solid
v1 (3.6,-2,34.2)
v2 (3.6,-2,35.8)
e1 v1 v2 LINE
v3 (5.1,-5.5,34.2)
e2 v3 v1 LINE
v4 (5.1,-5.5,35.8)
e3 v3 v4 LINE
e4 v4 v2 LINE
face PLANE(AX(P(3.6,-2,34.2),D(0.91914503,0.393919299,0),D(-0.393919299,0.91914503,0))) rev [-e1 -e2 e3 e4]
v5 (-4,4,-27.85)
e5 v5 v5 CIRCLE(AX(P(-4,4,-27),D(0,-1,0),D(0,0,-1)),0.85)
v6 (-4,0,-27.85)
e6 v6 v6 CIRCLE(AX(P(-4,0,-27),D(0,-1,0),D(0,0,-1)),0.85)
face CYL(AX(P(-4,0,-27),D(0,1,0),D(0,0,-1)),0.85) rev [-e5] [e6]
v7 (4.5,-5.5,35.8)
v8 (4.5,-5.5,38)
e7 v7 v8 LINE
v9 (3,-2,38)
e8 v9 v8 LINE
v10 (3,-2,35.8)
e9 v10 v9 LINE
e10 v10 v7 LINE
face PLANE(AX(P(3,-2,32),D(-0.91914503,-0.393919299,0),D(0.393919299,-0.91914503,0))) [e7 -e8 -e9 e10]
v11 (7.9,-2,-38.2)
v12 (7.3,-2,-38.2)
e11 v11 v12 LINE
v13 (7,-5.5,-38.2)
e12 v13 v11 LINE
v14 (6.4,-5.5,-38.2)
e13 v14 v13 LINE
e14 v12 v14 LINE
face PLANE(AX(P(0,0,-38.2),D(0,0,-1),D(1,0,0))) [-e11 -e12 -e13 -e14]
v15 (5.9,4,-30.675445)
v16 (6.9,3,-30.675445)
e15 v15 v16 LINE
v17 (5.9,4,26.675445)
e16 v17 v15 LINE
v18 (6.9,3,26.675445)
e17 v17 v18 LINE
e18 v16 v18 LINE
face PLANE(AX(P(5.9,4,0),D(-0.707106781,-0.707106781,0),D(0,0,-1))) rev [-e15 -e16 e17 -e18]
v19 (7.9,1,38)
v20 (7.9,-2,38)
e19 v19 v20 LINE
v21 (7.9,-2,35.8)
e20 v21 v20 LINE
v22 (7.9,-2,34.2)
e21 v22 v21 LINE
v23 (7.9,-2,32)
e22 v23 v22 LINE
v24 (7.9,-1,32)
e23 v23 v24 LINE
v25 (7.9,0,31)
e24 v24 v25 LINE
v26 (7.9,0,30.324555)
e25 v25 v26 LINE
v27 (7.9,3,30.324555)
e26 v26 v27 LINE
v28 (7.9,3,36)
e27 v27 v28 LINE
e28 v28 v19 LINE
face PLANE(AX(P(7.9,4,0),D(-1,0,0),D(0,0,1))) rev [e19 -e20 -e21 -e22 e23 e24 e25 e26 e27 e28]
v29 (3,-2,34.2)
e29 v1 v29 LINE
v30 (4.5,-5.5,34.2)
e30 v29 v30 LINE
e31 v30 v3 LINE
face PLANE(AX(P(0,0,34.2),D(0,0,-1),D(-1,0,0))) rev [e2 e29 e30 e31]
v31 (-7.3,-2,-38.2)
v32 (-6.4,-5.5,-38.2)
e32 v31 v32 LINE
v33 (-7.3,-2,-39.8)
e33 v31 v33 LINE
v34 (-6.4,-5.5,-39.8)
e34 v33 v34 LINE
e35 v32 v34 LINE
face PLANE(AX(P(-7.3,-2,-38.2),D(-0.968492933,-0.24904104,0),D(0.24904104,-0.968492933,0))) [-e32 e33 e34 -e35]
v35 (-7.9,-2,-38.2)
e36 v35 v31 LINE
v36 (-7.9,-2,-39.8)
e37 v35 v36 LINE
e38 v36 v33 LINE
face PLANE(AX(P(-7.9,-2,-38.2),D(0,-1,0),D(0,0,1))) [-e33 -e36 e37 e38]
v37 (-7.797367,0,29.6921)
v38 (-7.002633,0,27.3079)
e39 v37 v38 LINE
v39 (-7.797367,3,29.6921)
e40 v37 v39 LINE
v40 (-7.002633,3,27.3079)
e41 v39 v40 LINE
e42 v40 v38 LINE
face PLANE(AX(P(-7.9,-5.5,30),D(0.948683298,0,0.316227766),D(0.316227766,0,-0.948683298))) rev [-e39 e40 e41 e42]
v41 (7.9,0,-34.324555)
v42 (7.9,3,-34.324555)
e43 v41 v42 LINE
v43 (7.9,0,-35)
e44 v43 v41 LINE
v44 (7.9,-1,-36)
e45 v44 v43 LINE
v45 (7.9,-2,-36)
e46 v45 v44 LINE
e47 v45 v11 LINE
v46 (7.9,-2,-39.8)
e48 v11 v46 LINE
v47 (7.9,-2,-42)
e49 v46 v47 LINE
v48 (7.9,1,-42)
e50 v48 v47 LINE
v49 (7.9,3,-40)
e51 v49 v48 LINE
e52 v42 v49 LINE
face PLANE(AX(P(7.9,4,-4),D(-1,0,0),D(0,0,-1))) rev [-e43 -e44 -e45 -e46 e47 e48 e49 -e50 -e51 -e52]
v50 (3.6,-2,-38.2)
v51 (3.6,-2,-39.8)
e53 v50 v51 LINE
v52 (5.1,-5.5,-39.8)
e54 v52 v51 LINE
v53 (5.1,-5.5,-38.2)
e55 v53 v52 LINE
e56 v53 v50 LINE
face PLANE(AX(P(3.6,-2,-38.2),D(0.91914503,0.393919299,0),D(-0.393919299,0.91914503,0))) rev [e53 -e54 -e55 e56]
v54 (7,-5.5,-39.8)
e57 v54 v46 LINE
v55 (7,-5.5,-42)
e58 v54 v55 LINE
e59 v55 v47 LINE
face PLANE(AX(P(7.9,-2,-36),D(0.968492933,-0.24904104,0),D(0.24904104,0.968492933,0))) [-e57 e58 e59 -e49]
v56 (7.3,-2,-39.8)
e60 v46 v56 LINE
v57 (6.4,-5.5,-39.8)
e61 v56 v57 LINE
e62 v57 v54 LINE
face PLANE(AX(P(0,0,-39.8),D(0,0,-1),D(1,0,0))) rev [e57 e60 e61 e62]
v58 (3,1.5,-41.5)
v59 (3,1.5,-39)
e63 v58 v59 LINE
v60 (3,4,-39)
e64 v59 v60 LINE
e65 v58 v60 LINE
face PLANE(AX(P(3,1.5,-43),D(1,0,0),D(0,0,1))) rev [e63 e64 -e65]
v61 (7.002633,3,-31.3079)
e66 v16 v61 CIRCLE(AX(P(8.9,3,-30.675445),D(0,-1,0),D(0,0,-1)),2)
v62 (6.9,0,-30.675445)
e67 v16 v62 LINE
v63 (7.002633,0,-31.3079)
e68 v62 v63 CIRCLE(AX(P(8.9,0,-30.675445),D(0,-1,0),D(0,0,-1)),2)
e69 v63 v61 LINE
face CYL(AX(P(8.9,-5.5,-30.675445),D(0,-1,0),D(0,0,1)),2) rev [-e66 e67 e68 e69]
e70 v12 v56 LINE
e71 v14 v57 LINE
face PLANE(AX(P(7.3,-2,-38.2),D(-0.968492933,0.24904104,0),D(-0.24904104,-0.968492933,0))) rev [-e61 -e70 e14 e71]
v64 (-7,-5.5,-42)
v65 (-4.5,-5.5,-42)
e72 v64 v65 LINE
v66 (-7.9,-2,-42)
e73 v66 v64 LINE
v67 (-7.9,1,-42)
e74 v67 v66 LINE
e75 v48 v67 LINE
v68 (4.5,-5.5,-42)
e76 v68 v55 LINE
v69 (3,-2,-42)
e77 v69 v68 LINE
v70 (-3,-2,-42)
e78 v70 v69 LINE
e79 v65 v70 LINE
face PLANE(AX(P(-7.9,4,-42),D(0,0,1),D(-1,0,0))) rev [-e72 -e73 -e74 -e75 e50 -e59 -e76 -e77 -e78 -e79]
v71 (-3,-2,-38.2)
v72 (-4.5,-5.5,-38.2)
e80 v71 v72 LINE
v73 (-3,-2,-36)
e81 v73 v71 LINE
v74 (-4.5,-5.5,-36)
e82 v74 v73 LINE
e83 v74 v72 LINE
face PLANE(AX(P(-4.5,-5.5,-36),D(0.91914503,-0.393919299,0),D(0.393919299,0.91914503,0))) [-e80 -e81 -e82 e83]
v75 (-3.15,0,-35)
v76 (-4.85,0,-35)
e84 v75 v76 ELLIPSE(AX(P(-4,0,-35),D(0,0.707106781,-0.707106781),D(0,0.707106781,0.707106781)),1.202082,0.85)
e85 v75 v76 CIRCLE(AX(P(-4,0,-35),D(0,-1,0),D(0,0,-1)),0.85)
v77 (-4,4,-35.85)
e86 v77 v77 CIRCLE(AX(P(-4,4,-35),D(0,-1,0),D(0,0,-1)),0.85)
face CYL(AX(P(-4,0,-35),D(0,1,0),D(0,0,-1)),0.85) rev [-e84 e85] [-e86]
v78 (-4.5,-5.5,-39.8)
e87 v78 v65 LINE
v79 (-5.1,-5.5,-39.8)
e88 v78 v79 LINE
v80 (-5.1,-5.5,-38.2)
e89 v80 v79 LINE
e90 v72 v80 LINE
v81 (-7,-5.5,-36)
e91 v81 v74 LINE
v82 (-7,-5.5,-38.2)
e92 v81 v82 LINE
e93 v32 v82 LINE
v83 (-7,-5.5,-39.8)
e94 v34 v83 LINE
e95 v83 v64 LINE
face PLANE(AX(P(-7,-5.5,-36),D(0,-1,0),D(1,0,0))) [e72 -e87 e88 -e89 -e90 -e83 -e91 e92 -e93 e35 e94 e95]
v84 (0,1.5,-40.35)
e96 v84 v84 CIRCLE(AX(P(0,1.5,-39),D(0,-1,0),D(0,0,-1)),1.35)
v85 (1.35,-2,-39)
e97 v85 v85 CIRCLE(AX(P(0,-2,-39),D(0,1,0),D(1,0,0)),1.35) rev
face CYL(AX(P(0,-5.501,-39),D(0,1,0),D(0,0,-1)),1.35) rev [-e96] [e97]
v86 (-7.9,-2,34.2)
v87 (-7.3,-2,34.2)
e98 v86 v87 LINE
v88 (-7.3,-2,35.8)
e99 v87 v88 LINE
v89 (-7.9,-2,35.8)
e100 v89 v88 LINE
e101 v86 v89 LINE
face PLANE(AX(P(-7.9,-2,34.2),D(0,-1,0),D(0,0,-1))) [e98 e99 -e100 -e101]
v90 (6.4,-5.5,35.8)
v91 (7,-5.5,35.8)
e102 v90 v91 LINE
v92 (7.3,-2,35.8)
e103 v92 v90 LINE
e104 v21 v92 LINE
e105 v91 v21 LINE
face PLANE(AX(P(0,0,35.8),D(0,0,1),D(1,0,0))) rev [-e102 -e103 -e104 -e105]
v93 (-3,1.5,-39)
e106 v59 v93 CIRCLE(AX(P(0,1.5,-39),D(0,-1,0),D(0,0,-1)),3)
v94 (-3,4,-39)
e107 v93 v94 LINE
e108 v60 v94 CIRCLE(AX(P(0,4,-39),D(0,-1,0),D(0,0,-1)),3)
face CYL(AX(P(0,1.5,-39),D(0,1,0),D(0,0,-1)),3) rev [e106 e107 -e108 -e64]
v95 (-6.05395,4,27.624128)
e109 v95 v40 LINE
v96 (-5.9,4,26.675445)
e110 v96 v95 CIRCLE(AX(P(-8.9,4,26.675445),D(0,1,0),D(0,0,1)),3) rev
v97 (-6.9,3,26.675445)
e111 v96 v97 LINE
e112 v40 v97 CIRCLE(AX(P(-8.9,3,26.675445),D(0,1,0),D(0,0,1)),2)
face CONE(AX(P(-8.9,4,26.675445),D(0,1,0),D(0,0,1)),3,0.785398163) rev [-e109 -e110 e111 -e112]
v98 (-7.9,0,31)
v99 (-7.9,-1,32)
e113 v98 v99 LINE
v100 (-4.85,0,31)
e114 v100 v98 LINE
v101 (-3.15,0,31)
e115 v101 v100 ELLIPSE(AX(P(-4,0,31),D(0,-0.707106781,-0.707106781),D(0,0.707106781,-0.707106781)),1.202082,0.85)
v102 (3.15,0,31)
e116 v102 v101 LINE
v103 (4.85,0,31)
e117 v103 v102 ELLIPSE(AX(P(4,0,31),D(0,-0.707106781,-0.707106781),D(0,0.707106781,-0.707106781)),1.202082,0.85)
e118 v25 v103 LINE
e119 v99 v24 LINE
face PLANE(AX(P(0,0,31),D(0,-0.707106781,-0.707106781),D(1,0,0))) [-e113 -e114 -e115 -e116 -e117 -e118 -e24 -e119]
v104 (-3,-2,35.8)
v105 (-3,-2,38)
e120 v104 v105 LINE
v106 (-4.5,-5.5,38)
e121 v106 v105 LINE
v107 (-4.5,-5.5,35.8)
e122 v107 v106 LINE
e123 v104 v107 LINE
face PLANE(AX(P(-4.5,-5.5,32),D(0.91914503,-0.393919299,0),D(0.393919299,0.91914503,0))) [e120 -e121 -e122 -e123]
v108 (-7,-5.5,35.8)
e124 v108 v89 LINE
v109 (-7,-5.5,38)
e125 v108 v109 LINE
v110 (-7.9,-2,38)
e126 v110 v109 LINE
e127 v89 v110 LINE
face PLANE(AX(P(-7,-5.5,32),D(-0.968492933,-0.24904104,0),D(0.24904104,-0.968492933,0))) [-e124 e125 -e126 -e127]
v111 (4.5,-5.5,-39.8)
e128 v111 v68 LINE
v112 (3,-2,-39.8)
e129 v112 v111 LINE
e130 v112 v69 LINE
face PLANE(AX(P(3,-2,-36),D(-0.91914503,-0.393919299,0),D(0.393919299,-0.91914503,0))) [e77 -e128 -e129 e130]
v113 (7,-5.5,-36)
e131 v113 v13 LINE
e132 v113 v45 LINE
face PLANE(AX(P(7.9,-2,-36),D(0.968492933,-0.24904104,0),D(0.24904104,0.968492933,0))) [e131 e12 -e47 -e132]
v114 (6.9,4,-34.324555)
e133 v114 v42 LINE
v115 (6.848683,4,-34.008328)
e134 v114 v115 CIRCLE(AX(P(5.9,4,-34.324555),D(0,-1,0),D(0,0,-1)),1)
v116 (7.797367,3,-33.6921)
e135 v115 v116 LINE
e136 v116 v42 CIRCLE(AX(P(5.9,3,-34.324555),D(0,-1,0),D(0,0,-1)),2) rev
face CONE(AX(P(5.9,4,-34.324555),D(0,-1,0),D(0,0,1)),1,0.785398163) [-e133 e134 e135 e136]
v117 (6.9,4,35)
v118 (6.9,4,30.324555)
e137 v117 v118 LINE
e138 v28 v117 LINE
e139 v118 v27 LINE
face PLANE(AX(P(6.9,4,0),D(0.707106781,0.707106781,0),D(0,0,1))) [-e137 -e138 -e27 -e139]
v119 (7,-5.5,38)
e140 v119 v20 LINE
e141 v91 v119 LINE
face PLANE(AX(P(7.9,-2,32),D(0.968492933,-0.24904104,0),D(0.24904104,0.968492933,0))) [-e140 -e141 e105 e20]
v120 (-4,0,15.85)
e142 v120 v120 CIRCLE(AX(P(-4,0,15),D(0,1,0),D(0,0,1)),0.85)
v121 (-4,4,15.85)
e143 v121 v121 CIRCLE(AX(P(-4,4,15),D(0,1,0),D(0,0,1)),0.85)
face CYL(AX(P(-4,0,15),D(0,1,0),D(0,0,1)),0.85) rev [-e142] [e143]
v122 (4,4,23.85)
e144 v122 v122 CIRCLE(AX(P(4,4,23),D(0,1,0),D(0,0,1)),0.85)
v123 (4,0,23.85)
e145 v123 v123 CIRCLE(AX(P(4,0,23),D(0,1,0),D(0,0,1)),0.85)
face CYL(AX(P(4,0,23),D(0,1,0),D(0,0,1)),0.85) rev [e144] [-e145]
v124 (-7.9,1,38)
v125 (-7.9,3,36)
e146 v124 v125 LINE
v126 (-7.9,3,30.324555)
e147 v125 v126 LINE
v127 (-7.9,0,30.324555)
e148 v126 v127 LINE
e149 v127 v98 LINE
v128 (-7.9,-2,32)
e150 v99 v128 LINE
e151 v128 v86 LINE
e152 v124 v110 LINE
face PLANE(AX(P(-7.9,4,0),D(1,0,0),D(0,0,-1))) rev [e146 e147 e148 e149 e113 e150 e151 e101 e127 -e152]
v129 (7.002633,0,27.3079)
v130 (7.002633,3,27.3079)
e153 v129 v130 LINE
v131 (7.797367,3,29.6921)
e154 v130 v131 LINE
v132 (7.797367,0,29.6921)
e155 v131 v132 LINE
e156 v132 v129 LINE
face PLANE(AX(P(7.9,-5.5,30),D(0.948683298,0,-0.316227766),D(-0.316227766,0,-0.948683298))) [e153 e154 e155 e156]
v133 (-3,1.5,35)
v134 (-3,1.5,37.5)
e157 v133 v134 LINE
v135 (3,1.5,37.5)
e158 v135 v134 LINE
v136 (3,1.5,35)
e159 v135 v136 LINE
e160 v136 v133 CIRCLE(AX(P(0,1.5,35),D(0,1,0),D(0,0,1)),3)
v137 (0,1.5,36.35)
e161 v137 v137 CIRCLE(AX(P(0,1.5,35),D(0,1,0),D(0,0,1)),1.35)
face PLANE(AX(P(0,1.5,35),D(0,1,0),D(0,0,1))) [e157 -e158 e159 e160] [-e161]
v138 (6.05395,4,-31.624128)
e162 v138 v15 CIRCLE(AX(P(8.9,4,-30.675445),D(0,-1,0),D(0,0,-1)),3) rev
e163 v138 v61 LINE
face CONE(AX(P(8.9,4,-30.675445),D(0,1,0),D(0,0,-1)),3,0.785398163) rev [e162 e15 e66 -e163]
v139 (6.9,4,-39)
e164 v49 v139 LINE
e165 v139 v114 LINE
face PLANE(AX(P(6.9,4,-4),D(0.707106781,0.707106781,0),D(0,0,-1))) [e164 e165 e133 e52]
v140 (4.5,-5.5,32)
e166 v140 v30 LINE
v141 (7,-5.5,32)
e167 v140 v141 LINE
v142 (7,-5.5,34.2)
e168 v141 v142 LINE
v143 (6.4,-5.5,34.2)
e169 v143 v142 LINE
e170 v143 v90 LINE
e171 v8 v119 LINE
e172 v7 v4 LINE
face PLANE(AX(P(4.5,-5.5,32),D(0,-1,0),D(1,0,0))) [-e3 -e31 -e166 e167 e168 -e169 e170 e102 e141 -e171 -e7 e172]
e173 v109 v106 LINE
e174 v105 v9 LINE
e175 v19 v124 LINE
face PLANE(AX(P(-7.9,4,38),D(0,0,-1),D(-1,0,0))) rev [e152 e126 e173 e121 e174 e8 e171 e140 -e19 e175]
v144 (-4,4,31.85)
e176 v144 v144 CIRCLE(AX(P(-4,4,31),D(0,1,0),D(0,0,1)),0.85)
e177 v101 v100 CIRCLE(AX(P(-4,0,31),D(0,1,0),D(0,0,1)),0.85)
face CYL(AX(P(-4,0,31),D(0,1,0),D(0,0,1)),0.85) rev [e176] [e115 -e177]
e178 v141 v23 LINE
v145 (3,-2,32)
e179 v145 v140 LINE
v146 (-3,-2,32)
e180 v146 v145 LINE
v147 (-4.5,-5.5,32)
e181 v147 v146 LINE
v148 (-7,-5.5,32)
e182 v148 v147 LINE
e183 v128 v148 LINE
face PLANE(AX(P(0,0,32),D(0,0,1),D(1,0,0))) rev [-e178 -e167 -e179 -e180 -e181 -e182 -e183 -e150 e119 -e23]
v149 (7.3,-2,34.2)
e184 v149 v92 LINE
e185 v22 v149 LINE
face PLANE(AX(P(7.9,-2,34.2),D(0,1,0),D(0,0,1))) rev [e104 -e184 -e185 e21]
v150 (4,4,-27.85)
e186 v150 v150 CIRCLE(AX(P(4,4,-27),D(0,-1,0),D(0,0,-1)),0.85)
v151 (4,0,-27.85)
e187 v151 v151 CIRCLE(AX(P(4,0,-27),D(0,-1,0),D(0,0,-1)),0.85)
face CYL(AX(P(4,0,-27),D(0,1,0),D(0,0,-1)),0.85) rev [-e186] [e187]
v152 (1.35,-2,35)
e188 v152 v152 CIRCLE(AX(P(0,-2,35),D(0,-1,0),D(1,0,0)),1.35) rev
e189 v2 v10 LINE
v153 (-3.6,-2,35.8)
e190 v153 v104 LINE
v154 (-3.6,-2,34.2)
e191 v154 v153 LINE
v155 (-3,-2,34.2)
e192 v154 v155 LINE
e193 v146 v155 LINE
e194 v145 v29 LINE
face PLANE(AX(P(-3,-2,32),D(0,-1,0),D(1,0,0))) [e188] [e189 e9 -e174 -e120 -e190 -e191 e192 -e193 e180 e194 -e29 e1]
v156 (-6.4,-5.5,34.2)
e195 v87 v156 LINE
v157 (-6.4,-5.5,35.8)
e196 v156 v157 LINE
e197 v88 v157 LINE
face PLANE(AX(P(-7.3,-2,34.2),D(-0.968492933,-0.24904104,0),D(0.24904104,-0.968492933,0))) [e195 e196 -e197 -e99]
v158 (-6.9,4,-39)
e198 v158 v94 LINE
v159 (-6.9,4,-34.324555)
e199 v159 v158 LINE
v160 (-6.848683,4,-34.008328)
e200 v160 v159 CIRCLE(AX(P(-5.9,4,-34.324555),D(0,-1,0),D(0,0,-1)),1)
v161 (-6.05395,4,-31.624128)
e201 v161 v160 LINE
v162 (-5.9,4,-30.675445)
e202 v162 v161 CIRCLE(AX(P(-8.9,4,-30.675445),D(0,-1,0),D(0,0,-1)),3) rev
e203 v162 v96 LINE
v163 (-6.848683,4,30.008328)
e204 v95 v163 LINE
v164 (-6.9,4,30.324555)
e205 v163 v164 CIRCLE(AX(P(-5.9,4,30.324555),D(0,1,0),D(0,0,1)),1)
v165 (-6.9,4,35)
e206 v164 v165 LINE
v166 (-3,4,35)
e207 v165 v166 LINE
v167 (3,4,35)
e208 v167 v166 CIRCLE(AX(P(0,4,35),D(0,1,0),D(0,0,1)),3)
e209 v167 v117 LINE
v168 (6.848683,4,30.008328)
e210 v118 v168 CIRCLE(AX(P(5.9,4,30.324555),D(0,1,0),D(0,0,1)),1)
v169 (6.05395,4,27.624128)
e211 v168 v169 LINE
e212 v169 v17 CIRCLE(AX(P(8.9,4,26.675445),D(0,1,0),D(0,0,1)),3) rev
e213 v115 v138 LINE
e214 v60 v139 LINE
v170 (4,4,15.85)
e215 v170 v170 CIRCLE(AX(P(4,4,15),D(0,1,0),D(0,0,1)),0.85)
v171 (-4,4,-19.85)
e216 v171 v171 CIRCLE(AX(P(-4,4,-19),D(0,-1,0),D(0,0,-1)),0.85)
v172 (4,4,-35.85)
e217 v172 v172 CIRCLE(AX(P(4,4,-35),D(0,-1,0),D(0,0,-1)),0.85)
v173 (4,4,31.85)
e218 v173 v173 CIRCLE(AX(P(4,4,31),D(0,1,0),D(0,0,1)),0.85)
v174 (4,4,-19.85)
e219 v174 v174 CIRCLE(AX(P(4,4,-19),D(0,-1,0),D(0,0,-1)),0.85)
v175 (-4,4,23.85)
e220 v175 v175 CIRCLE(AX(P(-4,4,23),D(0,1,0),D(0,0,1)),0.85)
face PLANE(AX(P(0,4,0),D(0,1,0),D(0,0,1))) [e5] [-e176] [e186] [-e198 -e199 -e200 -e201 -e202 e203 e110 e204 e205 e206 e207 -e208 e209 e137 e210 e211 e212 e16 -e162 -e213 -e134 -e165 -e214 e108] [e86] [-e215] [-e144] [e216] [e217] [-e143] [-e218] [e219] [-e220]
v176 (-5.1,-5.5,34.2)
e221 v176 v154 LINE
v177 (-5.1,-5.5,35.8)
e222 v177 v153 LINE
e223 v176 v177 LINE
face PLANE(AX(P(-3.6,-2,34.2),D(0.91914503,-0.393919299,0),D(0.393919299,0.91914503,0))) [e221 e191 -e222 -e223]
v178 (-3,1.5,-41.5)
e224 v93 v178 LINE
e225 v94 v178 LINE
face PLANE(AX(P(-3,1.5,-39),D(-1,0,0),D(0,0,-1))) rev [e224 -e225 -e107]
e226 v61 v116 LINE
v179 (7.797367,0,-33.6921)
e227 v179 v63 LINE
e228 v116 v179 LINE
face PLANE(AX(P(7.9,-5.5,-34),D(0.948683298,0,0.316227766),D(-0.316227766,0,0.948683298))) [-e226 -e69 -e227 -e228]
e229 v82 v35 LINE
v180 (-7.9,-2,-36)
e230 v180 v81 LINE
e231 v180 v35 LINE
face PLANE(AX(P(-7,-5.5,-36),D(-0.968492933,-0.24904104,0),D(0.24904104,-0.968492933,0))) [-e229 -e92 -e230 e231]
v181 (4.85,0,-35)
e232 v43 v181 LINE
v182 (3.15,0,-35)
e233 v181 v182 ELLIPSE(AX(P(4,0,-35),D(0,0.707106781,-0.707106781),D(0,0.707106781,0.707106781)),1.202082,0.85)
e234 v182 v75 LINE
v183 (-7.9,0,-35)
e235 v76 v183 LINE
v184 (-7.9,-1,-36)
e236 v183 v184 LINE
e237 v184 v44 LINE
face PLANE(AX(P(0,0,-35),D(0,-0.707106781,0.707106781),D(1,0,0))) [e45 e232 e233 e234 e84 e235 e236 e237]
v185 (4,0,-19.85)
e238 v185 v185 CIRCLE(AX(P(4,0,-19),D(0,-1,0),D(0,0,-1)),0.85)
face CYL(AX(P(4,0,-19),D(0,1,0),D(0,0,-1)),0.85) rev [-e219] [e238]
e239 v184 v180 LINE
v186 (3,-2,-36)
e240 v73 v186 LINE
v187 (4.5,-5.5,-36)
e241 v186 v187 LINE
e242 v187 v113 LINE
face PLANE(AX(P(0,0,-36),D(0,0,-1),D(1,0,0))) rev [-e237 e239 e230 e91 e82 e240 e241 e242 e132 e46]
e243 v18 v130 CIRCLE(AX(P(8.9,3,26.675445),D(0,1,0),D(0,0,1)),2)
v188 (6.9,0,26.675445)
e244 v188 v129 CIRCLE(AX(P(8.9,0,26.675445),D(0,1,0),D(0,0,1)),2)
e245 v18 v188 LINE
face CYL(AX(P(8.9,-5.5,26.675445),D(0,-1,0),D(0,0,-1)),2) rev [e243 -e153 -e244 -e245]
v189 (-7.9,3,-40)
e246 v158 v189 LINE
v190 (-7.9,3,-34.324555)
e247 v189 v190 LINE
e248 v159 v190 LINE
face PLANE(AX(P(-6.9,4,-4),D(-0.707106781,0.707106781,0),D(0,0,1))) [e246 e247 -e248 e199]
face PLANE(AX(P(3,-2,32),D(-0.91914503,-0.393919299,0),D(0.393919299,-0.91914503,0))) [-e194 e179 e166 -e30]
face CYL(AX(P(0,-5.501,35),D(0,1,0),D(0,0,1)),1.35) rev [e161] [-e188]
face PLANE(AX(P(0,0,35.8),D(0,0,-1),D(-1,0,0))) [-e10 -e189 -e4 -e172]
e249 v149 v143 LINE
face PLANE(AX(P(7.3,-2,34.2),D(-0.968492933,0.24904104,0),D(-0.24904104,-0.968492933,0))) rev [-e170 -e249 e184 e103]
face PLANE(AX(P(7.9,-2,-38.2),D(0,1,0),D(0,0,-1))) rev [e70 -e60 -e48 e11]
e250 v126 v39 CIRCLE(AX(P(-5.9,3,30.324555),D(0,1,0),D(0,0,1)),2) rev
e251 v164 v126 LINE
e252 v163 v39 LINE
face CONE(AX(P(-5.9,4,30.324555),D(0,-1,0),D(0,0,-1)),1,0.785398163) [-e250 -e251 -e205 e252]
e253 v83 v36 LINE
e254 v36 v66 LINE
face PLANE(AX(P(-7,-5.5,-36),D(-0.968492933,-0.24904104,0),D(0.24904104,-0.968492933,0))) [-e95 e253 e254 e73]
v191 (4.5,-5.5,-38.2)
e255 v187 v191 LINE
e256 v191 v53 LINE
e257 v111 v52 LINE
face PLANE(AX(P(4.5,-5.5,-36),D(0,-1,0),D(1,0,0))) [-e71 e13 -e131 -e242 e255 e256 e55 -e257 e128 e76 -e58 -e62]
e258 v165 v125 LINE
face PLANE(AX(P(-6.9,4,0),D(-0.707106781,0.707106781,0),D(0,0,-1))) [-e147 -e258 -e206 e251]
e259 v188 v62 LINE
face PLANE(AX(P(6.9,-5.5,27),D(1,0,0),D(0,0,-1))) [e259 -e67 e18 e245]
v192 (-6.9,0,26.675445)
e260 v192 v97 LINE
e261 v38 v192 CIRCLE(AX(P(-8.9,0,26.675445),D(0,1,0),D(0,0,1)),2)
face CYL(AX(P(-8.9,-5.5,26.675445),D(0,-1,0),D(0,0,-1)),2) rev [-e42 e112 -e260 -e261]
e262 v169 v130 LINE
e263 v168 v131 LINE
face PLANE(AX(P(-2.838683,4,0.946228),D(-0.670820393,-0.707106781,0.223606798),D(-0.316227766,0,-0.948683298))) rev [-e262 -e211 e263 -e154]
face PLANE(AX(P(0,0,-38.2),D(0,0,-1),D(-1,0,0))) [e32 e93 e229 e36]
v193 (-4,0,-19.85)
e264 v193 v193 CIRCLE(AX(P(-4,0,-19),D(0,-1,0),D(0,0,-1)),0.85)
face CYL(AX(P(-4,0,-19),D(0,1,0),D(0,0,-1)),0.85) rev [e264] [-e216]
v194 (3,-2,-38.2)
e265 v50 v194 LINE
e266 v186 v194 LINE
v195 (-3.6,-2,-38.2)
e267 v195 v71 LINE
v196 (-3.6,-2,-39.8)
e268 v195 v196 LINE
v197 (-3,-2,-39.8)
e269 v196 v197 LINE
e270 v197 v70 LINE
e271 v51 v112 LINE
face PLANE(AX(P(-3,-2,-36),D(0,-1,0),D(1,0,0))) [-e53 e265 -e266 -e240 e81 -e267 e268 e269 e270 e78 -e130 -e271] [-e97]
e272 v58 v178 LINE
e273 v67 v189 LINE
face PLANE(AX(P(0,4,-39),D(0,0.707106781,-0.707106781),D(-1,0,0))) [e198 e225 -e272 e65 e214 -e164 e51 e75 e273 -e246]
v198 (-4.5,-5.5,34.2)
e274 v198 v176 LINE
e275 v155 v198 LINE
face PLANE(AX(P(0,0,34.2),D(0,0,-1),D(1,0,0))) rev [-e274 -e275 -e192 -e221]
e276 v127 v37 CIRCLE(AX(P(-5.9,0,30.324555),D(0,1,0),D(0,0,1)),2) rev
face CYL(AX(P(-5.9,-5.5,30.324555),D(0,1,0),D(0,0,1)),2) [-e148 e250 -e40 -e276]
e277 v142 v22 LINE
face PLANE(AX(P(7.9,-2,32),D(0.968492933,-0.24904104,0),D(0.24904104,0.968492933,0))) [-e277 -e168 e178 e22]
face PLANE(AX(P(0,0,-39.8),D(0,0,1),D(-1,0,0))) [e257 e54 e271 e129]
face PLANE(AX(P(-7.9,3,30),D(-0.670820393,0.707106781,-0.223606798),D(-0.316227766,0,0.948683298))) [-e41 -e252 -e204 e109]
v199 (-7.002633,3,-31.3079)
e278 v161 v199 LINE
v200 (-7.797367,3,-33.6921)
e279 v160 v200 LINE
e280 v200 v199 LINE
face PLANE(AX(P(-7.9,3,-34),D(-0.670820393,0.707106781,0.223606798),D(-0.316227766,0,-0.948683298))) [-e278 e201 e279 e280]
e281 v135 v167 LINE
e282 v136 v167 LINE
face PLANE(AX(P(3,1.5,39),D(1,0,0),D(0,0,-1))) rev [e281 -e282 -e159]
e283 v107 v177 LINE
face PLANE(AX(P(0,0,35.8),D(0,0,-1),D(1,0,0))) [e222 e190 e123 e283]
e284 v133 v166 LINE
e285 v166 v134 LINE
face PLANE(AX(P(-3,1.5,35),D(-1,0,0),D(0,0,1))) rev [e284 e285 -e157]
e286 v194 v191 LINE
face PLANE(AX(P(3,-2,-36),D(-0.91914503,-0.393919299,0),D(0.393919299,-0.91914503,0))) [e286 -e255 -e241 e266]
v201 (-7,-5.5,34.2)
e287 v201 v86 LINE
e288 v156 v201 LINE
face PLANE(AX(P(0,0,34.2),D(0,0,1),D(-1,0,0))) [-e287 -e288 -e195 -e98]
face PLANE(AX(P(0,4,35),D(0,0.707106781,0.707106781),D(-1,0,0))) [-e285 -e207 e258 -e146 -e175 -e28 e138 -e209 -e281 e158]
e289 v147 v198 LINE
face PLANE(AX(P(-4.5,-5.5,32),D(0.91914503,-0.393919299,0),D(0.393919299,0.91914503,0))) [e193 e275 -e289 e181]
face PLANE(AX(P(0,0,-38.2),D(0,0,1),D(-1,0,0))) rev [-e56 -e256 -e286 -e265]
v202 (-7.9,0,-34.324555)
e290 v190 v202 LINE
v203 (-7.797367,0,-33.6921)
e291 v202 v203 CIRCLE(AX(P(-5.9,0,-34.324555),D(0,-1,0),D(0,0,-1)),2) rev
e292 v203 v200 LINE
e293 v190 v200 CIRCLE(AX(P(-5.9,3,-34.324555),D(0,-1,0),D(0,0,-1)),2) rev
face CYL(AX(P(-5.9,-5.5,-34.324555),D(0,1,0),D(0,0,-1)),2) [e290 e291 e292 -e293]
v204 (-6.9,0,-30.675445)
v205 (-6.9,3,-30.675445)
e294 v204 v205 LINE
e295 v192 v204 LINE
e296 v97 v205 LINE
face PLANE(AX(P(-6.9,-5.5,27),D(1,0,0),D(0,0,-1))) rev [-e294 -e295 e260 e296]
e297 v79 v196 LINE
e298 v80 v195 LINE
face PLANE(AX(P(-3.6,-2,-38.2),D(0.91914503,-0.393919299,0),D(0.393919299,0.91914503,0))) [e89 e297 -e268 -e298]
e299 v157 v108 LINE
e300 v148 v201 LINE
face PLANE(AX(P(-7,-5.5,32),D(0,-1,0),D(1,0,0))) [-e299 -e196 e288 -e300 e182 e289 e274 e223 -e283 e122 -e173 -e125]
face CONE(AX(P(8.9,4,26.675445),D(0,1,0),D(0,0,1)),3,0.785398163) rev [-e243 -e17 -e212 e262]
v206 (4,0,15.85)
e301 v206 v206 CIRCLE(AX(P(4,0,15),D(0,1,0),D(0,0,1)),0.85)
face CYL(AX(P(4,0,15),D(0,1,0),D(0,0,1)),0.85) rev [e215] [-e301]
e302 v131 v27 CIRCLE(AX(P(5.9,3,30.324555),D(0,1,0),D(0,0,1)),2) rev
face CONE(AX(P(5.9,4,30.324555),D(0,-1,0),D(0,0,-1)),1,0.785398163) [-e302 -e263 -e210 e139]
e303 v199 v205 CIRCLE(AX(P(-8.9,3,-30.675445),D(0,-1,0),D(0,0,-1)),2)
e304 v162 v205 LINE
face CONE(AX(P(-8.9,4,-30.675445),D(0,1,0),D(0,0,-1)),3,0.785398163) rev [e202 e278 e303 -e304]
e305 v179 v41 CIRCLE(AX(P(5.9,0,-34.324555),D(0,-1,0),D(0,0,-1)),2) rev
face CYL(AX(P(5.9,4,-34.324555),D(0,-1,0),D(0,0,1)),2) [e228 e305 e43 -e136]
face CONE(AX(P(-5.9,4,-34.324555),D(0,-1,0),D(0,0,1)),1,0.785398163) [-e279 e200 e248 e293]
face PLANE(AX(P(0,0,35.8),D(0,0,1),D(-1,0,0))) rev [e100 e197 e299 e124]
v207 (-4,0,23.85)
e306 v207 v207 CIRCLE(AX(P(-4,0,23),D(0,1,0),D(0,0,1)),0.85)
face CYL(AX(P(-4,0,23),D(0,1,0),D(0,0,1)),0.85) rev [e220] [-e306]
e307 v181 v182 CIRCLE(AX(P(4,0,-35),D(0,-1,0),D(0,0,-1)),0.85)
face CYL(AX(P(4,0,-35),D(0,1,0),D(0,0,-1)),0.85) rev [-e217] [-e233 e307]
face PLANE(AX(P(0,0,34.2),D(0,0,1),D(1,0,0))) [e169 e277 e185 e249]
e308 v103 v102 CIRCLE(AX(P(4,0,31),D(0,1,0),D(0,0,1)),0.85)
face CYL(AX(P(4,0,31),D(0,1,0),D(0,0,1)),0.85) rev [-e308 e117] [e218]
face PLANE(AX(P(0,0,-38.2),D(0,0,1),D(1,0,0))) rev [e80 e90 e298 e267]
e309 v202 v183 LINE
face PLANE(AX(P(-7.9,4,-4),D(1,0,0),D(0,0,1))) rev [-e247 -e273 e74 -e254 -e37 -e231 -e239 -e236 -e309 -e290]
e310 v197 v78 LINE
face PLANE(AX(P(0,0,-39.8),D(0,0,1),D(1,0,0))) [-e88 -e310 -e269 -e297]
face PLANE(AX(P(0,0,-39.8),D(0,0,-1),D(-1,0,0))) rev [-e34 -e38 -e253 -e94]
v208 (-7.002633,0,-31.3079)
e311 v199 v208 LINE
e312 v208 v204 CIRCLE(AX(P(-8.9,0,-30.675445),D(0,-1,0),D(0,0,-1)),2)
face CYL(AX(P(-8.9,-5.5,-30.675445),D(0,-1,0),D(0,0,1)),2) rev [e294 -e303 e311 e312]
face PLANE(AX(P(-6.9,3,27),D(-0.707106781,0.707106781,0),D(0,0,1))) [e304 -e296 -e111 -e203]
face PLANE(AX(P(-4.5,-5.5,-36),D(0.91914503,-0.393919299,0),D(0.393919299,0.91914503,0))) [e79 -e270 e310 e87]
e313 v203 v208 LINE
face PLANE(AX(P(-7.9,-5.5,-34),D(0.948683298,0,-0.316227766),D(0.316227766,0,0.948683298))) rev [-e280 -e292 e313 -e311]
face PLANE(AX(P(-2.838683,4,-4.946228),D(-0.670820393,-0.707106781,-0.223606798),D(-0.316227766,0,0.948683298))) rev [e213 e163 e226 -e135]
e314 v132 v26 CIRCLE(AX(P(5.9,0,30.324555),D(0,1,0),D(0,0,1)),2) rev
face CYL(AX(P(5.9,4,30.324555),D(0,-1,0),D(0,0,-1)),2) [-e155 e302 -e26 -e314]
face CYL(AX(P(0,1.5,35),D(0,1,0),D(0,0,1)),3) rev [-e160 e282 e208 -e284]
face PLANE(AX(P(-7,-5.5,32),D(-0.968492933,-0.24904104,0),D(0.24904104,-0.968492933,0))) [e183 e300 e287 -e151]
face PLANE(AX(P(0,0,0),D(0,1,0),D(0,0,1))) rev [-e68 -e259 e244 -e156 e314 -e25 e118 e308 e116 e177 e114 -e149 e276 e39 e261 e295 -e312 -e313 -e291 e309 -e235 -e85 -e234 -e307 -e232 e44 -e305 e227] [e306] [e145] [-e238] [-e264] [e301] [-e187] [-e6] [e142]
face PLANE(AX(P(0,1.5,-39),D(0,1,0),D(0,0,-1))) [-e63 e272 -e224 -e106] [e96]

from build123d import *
from build123d.topology import SkipClean

# Parameters (mm, degrees)
EXTRUDE_1_DEPTH        = 4
EXTRUDE_3_DEPTH        = 6
CHAMFER_1_SIZE         = 3
SKETCH_5_R             = 0.85
CUT_EXTRUDE_1_DEPTH    = 4
PATTERN_LINEAR_1_COUNT = 4
PATTERN_LINEAR_1_PITCH = 8
CUT_EXTRUDE_2_DEPTH    = 2.5
CUT_EXTRUDE_3_REACH    = 41.439
SKETCH_7_R             = 1.35
SKETCH_8_R             = 6
EXTRUDE_4_DEPTH        = 1.5
FILLET_1_R             = 0.5
SKETCH_9_R             = 5
CUT_EXTRUDE_4_DEPTH    = 3.6
SKETCH_10_R            = 3.55
CUT_EXTRUDE_5_DEPTH    = 3.6
CUT_EXTRUDE_6_DEPTH    = 0.8
CUT_EXTRUDE_7_DEPTH    = 40.958228189
FILLET_2_R             = 2
CHAMFER_2_SIZE         = 1
EXTRUDE_5_DEPTH        = 10


with BuildPart() as part:
    # ｽｹｯﾁ1 → ﾎﾞｽ - 押し出し1 (new body)
    with BuildSketch(Plane(origin=(0, 0, 0), x_dir=(1, 0, 0), z_dir=(0, 1, 0))):
        with BuildLine():
            Line((-7.9, 0), (-7.9, -38))
            Line((-7.9, -38), (7.9, -38))
            Line((7.9, -38), (7.9, 0))
            ThreePointArc((7.9, 0), (0, 7.9), (-7.9, 0))
        make_face()
    extrude(amount=EXTRUDE_1_DEPTH)

    # ｽｹｯﾁ4 → ﾎﾞｽ - 押し出し3 (add)
    with BuildSketch(Plane.XY.offset(38)):
        Polygon((-7, -5.5), (-4.5, -5.5), (-3, -2), (3, -2), (4.5, -5.5), (7, -5.5), (7.9, -2), (7.9, 0), (-7.9, 0), (-7.9, -2), align=None)
    extrude(amount=-EXTRUDE_3_DEPTH)

    # 面取り1
    chamfer_1_edges = [part.edges().sort_by_distance(p)[0] for p in [
        (0, 4, 38),
    ]]
    chamfer(chamfer_1_edges, length=CHAMFER_1_SIZE)

    # ｽｹｯﾁ5 → ｶｯﾄ - 押し出し1 (cut)
    with BuildSketch(Plane(origin=(0, 4, 0), x_dir=(1, 0, 0), z_dir=(0, 1, 0))):
        with Locations(Location((-4, -31, 0), (0, 0, 270))):
            Circle(SKETCH_5_R)
        with Locations(Location((4, -31, 0), (0, 0, 270))):
            Circle(SKETCH_5_R)
    cut_extrude_1 = extrude(amount=-CUT_EXTRUDE_1_DEPTH, mode=Mode.SUBTRACT)

    # 直線ﾊﾟﾀｰﾝ1: ｶｯﾄ - 押し出し1 ×4
    with Locations(*[(0, 0, -i * PATTERN_LINEAR_1_PITCH) for i in range(1, PATTERN_LINEAR_1_COUNT)]):
        add(cut_extrude_1, mode=Mode.SUBTRACT)

    # ｽｹｯﾁ6 → ｶｯﾄ - 押し出し2 (cut)
    with BuildSketch(Plane(origin=(0, 4, 0), x_dir=(1, 0, 0), z_dir=(0, 1, 0))):
        with BuildLine():
            Line((-3, -35), (-3, -39))
            Line((-3, -39), (3, -39))
            Line((3, -39), (3, -35))
            ThreePointArc((3, -35), (0, -32), (-3, -35))
        make_face()
    extrude(amount=-CUT_EXTRUDE_2_DEPTH, mode=Mode.SUBTRACT)

    # ｽｹｯﾁ7 → ｶｯﾄ - 押し出し3 (cut, up to next)
    with BuildSketch(Plane(origin=(0, 1.5, 0), x_dir=(1, 0, 0), z_dir=(0, 1, 0)), mode=Mode.PRIVATE) as cut_extrude_3_sk1:
        with Locations(Location((0, -35, 0), (0, 0, 270))):
            Circle(SKETCH_7_R)
    cut_extrude_3_tool1 = extrude(cut_extrude_3_sk1.sketch, amount=-CUT_EXTRUDE_3_REACH, mode=Mode.PRIVATE) & part.part
    add(cut_extrude_3_tool1.solids().sort_by_distance((0, 1.5, 35))[0], mode=Mode.SUBTRACT)

    # ｽｹｯﾁ8 → ﾎﾞｽ - 押し出し4 (add)
    with BuildSketch(Plane.XZ):
        with Locations(Location((0, 0, 0), (0, 0, 90))):
            Circle(SKETCH_8_R)
    extrude(amount=EXTRUDE_4_DEPTH)

    # ﾌｨﾚｯﾄ1
    fillet_1_edges = [part.edges().sort_by_distance(p)[0] for p in [
        (0, 0, -6),
    ]]
    fillet(fillet_1_edges, radius=FILLET_1_R)

    # ｽｹｯﾁ9 → ｶｯﾄ - 押し出し4 (cut)
    with BuildSketch(Plane(origin=(0, 4, 0), x_dir=(1, 0, 0), z_dir=(0, 1, 0))):
        with Locations(Location((0, 0, 0), (0, 0, 270))):
            Circle(SKETCH_9_R)
    extrude(amount=-CUT_EXTRUDE_4_DEPTH, mode=Mode.SUBTRACT)

    # ｽｹｯﾁ10 → ｶｯﾄ - 押し出し5 (cut)
    with BuildSketch(Plane(origin=(0, 0.4, 0), x_dir=(1, 0, 0), z_dir=(0, 1, 0))):
        with Locations(Location((0, 0, 0), (0, 0, 270))):
            Circle(SKETCH_10_R)
    extrude(amount=-CUT_EXTRUDE_5_DEPTH, mode=Mode.SUBTRACT)

    # ｽｹｯﾁ11 → ｶｯﾄ - 押し出し6 (cut, symmetric)
    with BuildSketch(Plane.XY.offset(35)):
        Polygon((3, -2), (4.5, -5.5), (5.1, -5.5), (3.6, -2), align=None)
        Polygon((7.9, -2), (7, -5.5), (6.4, -5.5), (7.3, -2), align=None)
    cut_extrude_6 = extrude(amount=CUT_EXTRUDE_6_DEPTH, both=True, mode=Mode.SUBTRACT)

    # ﾐﾗｰ1: ｶｯﾄ - 押し出し6 across plane
    add(cut_extrude_6.mirror(Plane(origin=(0, 0, 0), x_dir=(0, 0, 1), z_dir=(1, 0, 0))), mode=Mode.SUBTRACT)

    # ｽｹｯﾁ12 → ｶｯﾄ - 押し出し7 (cut, through all)
    with SkipClean():  # the faces are left unmerged after this step: merging them gives an invalid solid
        with BuildSketch(Plane(origin=(0, 4, 0), x_dir=(1, 0, 0), z_dir=(0, 1, 0))):
            with BuildLine():
                Line((-7.9, 0), (-7.9, -30))
                Line((-7.9, -30), (-6.9, -27))
                Line((-6.9, -27), (-6.9, -3.847076812))
                ThreePointArc((-6.9, -3.847076812), (-7.645913941, -1.987460691), (-7.9, 0))
            make_face()
        cut_extrude_7 = extrude(amount=-CUT_EXTRUDE_7_DEPTH, mode=Mode.SUBTRACT)

    # ﾐﾗｰ2: ｶｯﾄ - 押し出し7 across plane
    with SkipClean():  # the faces are left unmerged after this step: merging them gives an invalid solid
        add(cut_extrude_7.mirror(Plane(origin=(0, 0, 0), x_dir=(0, 0, 1), z_dir=(1, 0, 0))), mode=Mode.SUBTRACT)

    # ﾌｨﾚｯﾄ2
    fillet_2_edges = [part.edges().sort_by_distance(p)[0] for p in [
        (-6.9, 2, 3.847076812),
        (-6.9, 2, 27),
        (-7.9, 2, 30),
        (6.9, 2, 3.847076812),
        (7.9, 2, 30),
        (6.9, 2, 27),
    ]]
    fillet(fillet_2_edges, radius=FILLET_2_R)

    # 面取り2
    # the kernel refuses this chamfer: 1 mm, written as the material it adds along each edge
    with BuildSketch(Plane(origin=(7.9, 0, 32), x_dir=(0, 0.02749587661058639, -0.9996219169112968), z_dir=(-1, 0, 0))) as chamfer_2_piece_1_section:
        Polygon((CHAMFER_2_SIZE * 0.999621916911, CHAMFER_2_SIZE * 0.0274958766106), (-CHAMFER_2_SIZE * 0.0274958766106, CHAMFER_2_SIZE * 0.999621916911), (0, 0), align=None)
    chamfer_2_piece_1 = extrude(amount=15.8, mode=Mode.PRIVATE)
    chamfer_2_piece_1 = chamfer_2_piece_1 - Plane(origin=(-4, -0.34097177, 31), x_dir=(0, 0, 1), z_dir=(0, 1, 0)) * Cylinder(0.85, 36, mode=Mode.PRIVATE)
    chamfer_2_piece_1 = chamfer_2_piece_1 - Plane(origin=(4, -0.34097177, 31), x_dir=(0, 0, 1), z_dir=(0, 1, 0)) * Cylinder(0.85, 36, mode=Mode.PRIVATE)
    add(chamfer_2_piece_1)
    # the kernel refuses this chamfer: 1 mm, written as the material it takes off along each edge
    with BuildSketch(Plane(origin=(-7.9, 4, 30.32455532), x_dir=(-0.027495876610586487, -0.9996219169112968, 0), z_dir=(0, 0, 1)), Plane(origin=(7.9, 4, 37.571682988), x_dir=(0.027495876610586487, -0.9996219169112968, 0), z_dir=(0, 0, -1))) as chamfer_2_2_piece_1:
        Polygon((CHAMFER_2_SIZE * 0.999621916911, CHAMFER_2_SIZE * 0.0274958766106), (-CHAMFER_2_SIZE * 0.0274958766106, CHAMFER_2_SIZE * 0.999621916911), (0, 0), align=None)
    extrude(amount=7.247127668, mode=Mode.SUBTRACT)
    with BuildSketch(Plane(origin=(0, 4, 0), x_dir=(1, 0, 0), z_dir=(0, 0, 1))) as chamfer_2_2_piece_2:
        Polygon((7.9, -CHAMFER_2_SIZE), (7.9 - CHAMFER_2_SIZE, 0), (7.9, 0), align=None)
    revolve(axis=Axis((0, 4, 0), (0, 1, 0)), revolution_arc=180, mode=Mode.SUBTRACT)
    with BuildSketch(Plane(origin=(-5.9, 4, 30.32455532), x_dir=(-1, 0, 0), z_dir=(0, 0, 1))) as chamfer_2_2_piece_3:
        Polygon((2, CHAMFER_2_SIZE), (2 - CHAMFER_2_SIZE, 0), (2, 0), align=None)
    revolve(axis=Axis((-5.9, 4, 30.32455532), (0, -1, 0)), revolution_arc=18.434948823, mode=Mode.SUBTRACT)
    with BuildSketch(Plane(origin=(-7.797366596, 4, 29.692099788), x_dir=(-0.02608487890572092, -0.9996219169112968, -0.008694959635240314), z_dir=(0.3162277660168382, 0, -0.9486832980505138))) as chamfer_2_2_piece_4:
        Polygon((CHAMFER_2_SIZE * 0.999621916911, -CHAMFER_2_SIZE * 0.0274958766106), (-CHAMFER_2_SIZE * 0.0274958766106, -CHAMFER_2_SIZE * 0.999621916911), (0, 0), align=None)
    extrude(amount=2.513167019, mode=Mode.SUBTRACT)
    with BuildSketch(Plane(origin=(-8.9, 4, 26.67544468), x_dir=(0.9486832980505135, 0, 0.3162277660168389), z_dir=(-0.3162277660168389, 0, 0.9486832980505135))) as chamfer_2_2_piece_5:
        Polygon((2, -CHAMFER_2_SIZE), (2 + CHAMFER_2_SIZE, 0), (2, 0), align=None)
    revolve(axis=Axis((-8.9, 4, 26.67544468), (0, 1, 0)), revolution_arc=18.434948823, mode=Mode.SUBTRACT)
    with BuildSketch(Plane(origin=(-6.9, 4, 26.67544468), x_dir=(-0.027495876610586487, -0.9996219169112968, 0), z_dir=(0, 0, -1))) as chamfer_2_2_piece_6:
        Polygon((CHAMFER_2_SIZE * 0.999621916911, -CHAMFER_2_SIZE * 0.0274958766106), (-CHAMFER_2_SIZE * 0.0274958766106, -CHAMFER_2_SIZE * 0.999621916911), (0, 0), align=None)
    extrude(amount=22.339548002, mode=Mode.SUBTRACT)
    with BuildSketch(Plane(origin=(-8.9, 4, 4.335896678), x_dir=(1, 0, 0), z_dir=(0, 0, 1))) as chamfer_2_2_piece_7:
        Polygon((2, -CHAMFER_2_SIZE), (2 + CHAMFER_2_SIZE, 0), (2, 0), align=None)
    revolve(axis=Axis((-8.9, 4, 4.335896678), (0, 1, 0)), revolution_arc=25.974390018, mode=Mode.SUBTRACT)
    with BuildSketch(Plane(origin=(8.9, 4, 4.335896678), x_dir=(-0.8989898989898989, 0, -0.43796936138745074), z_dir=(0.43796936138745074, 0, -0.8989898989898989))) as chamfer_2_2_piece_8:
        Polygon((2, -CHAMFER_2_SIZE), (2 + CHAMFER_2_SIZE, 0), (2, 0), align=None)
    revolve(axis=Axis((8.9, 4, 4.335896678), (0, 1, 0)), revolution_arc=25.974390018, mode=Mode.SUBTRACT)
    with BuildSketch(Plane(origin=(6.9, 4, 26.67544468), x_dir=(0.027495876610586487, -0.9996219169112968, 0), z_dir=(0, 0, -1))) as chamfer_2_2_piece_9:
        Polygon((CHAMFER_2_SIZE * 0.999621916911, CHAMFER_2_SIZE * 0.0274958766106), (-CHAMFER_2_SIZE * 0.0274958766106, CHAMFER_2_SIZE * 0.999621916911), (0, 0), align=None)
    extrude(amount=22.339548002, mode=Mode.SUBTRACT)
    with BuildSketch(Plane(origin=(8.9, 4, 26.67544468), x_dir=(-1, 0, 0), z_dir=(0, 0, -1))) as chamfer_2_2_piece_10:
        Polygon((2, -CHAMFER_2_SIZE), (2 + CHAMFER_2_SIZE, 0), (2, 0), align=None)
    revolve(axis=Axis((8.9, 4, 26.67544468), (0, 1, 0)), revolution_arc=18.434948823, mode=Mode.SUBTRACT)
    with BuildSketch(Plane(origin=(7.797366596, 4, 29.692099788), x_dir=(0.02608487890572092, -0.9996219169112968, -0.008694959635240314), z_dir=(-0.3162277660168382, 0, -0.9486832980505138))) as chamfer_2_2_piece_11:
        Polygon((CHAMFER_2_SIZE * 0.999621916911, CHAMFER_2_SIZE * 0.0274958766106), (-CHAMFER_2_SIZE * 0.0274958766106, CHAMFER_2_SIZE * 0.999621916911), (0, 0), align=None)
    extrude(amount=2.513167019, mode=Mode.SUBTRACT)
    with BuildSketch(Plane(origin=(5.9, 4, 30.32455532), x_dir=(0.9486832980505135, 0, -0.3162277660168389), z_dir=(-0.3162277660168389, 0, -0.9486832980505135))) as chamfer_2_2_piece_12:
        Polygon((2, CHAMFER_2_SIZE), (2 - CHAMFER_2_SIZE, 0), (2, 0), align=None)
    revolve(axis=Axis((5.9, 4, 30.32455532), (0, -1, 0)), revolution_arc=18.434948823, mode=Mode.SUBTRACT)
    with BuildSketch(Plane(origin=(0, 4, 0), x_dir=(0.8989898989898987, 0, 0.43796936138745124), z_dir=(-0.43796936138745124, 0, 0.8989898989898987))) as chamfer_2_2_piece_13:
        Polygon((7.9, -CHAMFER_2_SIZE), (7.9 - CHAMFER_2_SIZE, 0), (7.9, 0), align=None)
    revolve(axis=Axis((0, 4, 0), (0, 1, 0)), revolution_arc=25.974390018, mode=Mode.SUBTRACT)
    with BuildSketch(Plane(origin=(0, 4, 0), x_dir=(-0.8989898989898987, 0, 0.43796936138745124), z_dir=(0.43796936138745124, 0, 0.8989898989898987))) as chamfer_2_2_piece_14:
        Polygon((7.9, CHAMFER_2_SIZE), (7.9 - CHAMFER_2_SIZE, 0), (7.9, 0), align=None)
    revolve(axis=Axis((0, 4, 0), (0, -1, 0)), revolution_arc=25.974390018, mode=Mode.SUBTRACT)

    # Split Bodies 1
    split(bisect_by=Plane.XY.offset(8), keep=Keep.TOP)

    # ｽｹｯﾁ14 → ﾎﾞｽ - 押し出し5 (add)
    with BuildSketch(Plane(origin=(0, 0, 8), x_dir=(-1, 0, 0), z_dir=(0, 0, -1))):
        Polygon((6.9, 0), (-6.9, 0), (-6.9, 3), (-5.9, 4), (5.9, 4), (6.9, 3), align=None)
    extrude(amount=EXTRUDE_5_DEPTH)

    # ﾐﾗｰ3: part across plane


with BuildPart() as part_1:
    add(part.part)
    add(part.part.mirror(Plane(origin=(0, 0, -2), x_dir=(1, 0, 0), z_dir=(0, 0, -1))))


solid = part_1.part
